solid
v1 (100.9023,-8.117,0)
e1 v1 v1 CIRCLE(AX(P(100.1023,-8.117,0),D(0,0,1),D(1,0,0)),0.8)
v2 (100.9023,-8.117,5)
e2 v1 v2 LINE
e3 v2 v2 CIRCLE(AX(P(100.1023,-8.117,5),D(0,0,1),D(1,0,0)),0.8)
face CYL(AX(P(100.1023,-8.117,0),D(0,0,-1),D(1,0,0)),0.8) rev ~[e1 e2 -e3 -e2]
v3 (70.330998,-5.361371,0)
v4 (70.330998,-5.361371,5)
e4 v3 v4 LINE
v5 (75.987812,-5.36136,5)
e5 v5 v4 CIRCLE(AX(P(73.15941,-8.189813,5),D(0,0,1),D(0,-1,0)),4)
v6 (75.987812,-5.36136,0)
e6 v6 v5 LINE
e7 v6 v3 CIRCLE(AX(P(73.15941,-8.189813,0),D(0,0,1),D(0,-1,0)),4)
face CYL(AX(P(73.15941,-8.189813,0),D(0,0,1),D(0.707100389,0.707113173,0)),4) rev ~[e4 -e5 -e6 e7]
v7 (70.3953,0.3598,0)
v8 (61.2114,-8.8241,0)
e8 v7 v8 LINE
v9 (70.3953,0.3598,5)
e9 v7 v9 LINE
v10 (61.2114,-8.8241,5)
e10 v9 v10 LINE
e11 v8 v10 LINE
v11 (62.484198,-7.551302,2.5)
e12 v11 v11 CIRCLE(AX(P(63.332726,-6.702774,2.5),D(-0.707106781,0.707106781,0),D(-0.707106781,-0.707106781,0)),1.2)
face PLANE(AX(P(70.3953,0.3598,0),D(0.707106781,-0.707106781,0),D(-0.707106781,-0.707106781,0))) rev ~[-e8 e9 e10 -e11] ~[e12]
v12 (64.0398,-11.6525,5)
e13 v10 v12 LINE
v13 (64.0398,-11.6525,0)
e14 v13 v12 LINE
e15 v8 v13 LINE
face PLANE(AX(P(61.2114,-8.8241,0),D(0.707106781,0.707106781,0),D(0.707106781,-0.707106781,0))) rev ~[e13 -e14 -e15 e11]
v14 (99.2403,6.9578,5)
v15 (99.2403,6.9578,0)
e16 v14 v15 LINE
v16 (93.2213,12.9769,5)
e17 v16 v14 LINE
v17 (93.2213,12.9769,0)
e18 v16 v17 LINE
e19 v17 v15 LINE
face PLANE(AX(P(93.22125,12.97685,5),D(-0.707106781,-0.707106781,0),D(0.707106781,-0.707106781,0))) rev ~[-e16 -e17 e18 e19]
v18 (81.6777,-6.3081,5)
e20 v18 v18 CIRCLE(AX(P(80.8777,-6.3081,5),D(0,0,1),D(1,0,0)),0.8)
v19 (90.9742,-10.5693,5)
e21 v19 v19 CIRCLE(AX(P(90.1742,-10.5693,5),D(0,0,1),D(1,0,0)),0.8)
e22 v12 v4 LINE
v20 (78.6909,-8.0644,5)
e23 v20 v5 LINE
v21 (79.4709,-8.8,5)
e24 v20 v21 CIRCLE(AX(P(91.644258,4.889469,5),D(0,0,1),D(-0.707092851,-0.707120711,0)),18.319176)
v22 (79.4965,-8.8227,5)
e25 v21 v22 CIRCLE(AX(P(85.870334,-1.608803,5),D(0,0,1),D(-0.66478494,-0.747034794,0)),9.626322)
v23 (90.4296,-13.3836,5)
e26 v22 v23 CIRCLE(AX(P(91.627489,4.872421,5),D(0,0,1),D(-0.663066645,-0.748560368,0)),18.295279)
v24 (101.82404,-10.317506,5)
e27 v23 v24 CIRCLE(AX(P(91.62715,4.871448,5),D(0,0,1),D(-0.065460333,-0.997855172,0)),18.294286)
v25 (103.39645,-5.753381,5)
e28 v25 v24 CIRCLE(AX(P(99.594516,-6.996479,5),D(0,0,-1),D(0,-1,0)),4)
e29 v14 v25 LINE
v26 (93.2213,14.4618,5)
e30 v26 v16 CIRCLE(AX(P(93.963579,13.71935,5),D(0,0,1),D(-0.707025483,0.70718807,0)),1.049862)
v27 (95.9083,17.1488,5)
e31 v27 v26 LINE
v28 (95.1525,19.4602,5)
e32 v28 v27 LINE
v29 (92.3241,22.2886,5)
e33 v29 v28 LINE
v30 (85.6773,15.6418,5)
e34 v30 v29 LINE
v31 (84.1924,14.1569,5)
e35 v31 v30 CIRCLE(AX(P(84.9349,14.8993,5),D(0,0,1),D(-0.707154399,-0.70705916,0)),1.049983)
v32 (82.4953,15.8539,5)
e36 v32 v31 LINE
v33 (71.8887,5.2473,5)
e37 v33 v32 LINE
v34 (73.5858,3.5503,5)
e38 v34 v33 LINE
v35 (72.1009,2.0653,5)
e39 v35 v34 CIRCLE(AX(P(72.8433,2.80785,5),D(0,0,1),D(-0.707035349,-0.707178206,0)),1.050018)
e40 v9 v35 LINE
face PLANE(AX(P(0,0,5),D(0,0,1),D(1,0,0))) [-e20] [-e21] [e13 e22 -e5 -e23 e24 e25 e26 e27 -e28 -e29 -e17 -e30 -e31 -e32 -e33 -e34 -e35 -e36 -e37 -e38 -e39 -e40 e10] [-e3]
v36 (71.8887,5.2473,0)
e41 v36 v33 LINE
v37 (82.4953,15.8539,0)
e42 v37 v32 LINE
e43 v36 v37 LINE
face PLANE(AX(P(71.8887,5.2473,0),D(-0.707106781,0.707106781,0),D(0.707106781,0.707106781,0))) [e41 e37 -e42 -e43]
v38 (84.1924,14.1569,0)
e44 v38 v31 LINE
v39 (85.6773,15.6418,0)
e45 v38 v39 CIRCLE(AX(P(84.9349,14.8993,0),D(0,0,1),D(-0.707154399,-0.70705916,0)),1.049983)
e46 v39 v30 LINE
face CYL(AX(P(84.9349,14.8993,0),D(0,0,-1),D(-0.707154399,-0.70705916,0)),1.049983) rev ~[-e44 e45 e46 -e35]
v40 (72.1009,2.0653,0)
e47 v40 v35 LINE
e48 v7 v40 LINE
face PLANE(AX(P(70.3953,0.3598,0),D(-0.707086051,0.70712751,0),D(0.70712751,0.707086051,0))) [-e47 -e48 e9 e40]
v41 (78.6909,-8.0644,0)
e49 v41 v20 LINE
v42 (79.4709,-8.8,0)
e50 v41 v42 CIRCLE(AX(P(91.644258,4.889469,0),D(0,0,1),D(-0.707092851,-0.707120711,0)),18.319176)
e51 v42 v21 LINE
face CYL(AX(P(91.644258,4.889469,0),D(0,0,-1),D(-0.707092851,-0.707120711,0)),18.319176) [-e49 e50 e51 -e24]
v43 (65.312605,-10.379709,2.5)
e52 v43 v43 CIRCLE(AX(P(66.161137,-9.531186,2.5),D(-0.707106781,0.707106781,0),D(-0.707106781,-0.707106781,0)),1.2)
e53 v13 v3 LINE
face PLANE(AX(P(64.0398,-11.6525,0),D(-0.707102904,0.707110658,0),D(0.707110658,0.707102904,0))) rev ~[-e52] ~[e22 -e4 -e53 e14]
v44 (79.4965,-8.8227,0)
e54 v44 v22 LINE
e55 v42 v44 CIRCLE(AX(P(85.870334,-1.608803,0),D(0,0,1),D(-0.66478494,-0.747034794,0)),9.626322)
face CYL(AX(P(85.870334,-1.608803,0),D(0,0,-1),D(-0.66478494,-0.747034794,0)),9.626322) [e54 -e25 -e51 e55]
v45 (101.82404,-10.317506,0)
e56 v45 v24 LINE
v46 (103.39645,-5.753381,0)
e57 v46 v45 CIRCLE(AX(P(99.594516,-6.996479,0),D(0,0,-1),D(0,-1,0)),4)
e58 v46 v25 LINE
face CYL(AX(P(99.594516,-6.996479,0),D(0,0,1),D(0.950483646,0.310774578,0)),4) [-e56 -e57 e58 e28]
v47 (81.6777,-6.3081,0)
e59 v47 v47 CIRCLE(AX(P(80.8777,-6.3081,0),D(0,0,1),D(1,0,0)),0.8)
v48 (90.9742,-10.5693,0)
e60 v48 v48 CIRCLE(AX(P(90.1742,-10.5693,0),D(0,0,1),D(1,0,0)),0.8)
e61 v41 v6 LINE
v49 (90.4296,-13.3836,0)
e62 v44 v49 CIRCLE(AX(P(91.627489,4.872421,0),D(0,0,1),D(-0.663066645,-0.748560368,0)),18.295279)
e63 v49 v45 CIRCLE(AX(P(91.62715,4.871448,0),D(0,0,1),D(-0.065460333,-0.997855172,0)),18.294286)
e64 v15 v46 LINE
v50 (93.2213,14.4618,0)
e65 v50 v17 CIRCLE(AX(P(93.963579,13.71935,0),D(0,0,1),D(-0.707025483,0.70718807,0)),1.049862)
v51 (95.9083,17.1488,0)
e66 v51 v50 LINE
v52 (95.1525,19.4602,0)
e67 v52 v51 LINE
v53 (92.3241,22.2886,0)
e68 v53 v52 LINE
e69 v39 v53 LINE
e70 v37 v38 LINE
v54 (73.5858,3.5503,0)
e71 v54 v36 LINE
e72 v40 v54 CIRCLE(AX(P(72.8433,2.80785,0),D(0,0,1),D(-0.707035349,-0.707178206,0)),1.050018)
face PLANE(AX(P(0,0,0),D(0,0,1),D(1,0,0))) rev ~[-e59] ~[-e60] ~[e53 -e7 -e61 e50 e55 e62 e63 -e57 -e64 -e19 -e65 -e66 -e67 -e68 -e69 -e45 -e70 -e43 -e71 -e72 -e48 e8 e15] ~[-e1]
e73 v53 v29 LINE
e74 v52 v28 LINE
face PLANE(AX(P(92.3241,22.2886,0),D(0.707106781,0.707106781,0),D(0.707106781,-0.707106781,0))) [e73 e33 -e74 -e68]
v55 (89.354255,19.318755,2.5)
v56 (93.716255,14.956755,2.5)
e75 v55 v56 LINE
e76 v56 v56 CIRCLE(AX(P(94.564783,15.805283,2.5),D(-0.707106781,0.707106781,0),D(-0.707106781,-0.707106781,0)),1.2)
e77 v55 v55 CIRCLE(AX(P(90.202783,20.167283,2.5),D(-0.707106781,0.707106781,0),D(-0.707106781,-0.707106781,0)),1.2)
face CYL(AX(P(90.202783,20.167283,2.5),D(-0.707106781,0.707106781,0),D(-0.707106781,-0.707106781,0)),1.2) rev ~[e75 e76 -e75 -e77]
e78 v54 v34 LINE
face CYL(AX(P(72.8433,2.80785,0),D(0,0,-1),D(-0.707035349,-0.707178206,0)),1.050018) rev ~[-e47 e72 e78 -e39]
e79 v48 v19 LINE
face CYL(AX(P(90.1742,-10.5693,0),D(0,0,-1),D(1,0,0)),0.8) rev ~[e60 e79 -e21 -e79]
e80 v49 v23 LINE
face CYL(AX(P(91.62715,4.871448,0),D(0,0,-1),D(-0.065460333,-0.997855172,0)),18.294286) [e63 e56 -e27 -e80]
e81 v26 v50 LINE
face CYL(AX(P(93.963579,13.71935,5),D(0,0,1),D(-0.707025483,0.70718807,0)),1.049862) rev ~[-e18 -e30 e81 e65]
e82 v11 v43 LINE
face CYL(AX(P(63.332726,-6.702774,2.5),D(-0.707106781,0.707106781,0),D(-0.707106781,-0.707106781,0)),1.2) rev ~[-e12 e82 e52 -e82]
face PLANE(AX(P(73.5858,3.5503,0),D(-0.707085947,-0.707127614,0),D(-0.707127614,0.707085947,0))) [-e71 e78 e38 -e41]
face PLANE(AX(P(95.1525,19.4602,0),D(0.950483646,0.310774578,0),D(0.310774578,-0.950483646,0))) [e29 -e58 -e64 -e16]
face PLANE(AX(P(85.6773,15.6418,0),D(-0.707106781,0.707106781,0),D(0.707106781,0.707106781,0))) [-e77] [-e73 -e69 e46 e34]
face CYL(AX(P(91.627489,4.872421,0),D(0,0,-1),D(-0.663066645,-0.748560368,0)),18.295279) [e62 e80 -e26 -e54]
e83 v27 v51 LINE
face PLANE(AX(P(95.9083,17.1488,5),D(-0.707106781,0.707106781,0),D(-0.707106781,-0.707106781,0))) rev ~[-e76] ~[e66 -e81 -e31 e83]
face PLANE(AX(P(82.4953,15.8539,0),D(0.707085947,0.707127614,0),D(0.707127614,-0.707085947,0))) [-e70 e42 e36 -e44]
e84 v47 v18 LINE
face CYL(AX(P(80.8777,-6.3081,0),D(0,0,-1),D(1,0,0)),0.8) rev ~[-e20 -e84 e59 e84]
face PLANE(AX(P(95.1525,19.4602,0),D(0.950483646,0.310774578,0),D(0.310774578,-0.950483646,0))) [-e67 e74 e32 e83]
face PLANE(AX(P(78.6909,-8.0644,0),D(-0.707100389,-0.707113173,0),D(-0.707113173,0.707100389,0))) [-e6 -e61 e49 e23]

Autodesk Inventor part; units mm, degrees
ref_plane "YZ Plane" through (0, 0, 0) normal (1, 0, 0) x (0, 1, 0)
ref_plane "XZ Plane" through (0, 0, 0) normal (0, 1, 0) x (-1, 0, 0)
ref_plane "XY Plane" through (0, 0, 0) normal (0, 0, 1) x (1, 0, 0)
sketch "スケッチ2" plane through (0, 0, 0) normal (0, 0, 1) x (1, 0, 0)
  line L0 (0, 0) -> (7, 0) construction
  line L1 (7, 0) -> (7, -27) construction
  line L2 (7, -27) -> (0, -27) construction
  line L3 (0, -27) -> (0, 0) construction
  circle A0 centre (2.5, -3.7) radius 1.6 construction
  circle A1 centre (2.5, -23.3) radius 1.6 construction
  line L4 (5.05, -7.5) -> (0.05, -7.5) construction
  line L5 (0.05, -7.5) -> (0.05, -19.5) construction
  line L6 (0.05, -19.5) -> (5.05, -19.5) construction
  line L7 (5.05, -19.5) -> (5.05, -7.5) construction
  line L8 (0, -7.45) -> (5.1, -7.45) construction
  line L9 (5.1, -7.45) -> (5.1, -19.55) construction
  line L10 (5.1, -19.55) -> (0, -19.55) construction
  line L11 (0, -19.55) -> (0, -7.45) construction
  line L12 (88.7886, 25.8241) -> (57.6759, -5.2886) construction
  line L13 (57.6759, -5.2886) -> (61.2114, -8.8241) construction
  line L14 (61.2114, -8.8241) -> (84.1924, 14.1569) construction
  line L15 (92.3241, 22.2886) -> (88.7886, 25.8241) construction
  line L16 (70.3953, 0.3598) -> (72.1009, 2.0653)
  circle A2 centre (100.1023, -8.117) radius 0.8
  line L17 (7, 0) -> (45.561, -10.3324) construction
  line L18 (7, -27) -> (50.4418, -38.6402) construction
  line L19 (72.4418, -38.6402) -> (106.1477, -10.3575) construction
  line L20 (106.1477, -10.3575) -> (100.2529, -4.1751) construction
  arc A3 (45.561, -10.3324) -> (81.4937, -2.447) centre (55.9138, 28.3046) ccw construction
  line L21 (72.4418, -38.6402) -> (50.4418, -38.6402) construction
  line L22 (39, -8.8) -> (34, -8.8) construction
  line L23 (34, -8.8) -> (34, -33.8) construction
  line L24 (34, -33.8) -> (39, -33.8) construction
  line L25 (39, -33.8) -> (39, -8.8) construction
  circle A4 centre (97.0056, -9.675) radius 0.8 construction
  circle A5 centre (93.6401, -10.5063) radius 0.8 construction
  circle A6 centre (90.1742, -10.5693) radius 0.8
  circle A7 centre (86.7807, -9.8609) radius 0.8 construction
  circle A8 centre (83.6295, -8.4164) radius 0.8 construction
  circle A9 centre (80.8777, -6.3081) radius 0.8
  line L26 (100.2529, -4.1751) -> (104.2516, -8.3688)
  arc A10 (81.4937, -2.447) -> (100.2529, -4.1751) centre (91.6271, 4.8718) ccw construction
  line L27 (39, -15.3) -> (34, -15.3) construction
  line L28 (34, -15.3) -> (34, -27.3) construction
  line L29 (34, -27.3) -> (39, -27.3) construction
  line L30 (39, -27.3) -> (39, -15.3) construction
  line L31 (33.95, -15.25) -> (39.05, -15.25) construction
  line L32 (39.05, -15.25) -> (39.05, -27.35) construction
  line L33 (39.05, -27.35) -> (33.95, -27.35) construction
  line L34 (33.95, -27.35) -> (33.95, -15.25) construction
  circle A11 centre (36.5, -11.5) radius 1.6 construction
  circle A12 centre (36.5, -31.1) radius 1.6 construction
  line L35 (66, -30.5) -> (71, -30.5) construction
  circle A13 centre (68.5, -34.3) radius 1.6 construction
  line L36 (66, -37) -> (71, -37) construction
  line L37 (66, -18.5) -> (66, -30.5) construction
  line L38 (65.95, -30.55) -> (65.95, -18.45) construction
  line L39 (71, -30.5) -> (71, -18.5) construction
  line L40 (66, -12) -> (66, -37) construction
  line L41 (71, -37) -> (71, -12) construction
  line L42 (71.05, -18.45) -> (71.05, -30.55) construction
  line L43 (71.05, -30.55) -> (65.95, -30.55) construction
  circle A14 centre (68.5, -14.7) radius 1.6 construction
  line L44 (71, -18.5) -> (66, -18.5) construction
  line L45 (65.95, -18.45) -> (71.05, -18.45) construction
  line L46 (71, -12) -> (66, -12) construction
  circle A15 centre (71.05, -19.5) radius 1.05 construction
  circle A16 centre (65.95, -19.5) radius 1.05 construction
  circle A17 centre (65.95, -29.5) radius 1.05 construction
  circle A18 centre (71.05, -29.5) radius 1.05 construction
  circle A19 centre (39.05, -16.3) radius 1.05 construction
  circle A20 centre (33.95, -16.3) radius 1.05 construction
  circle A21 centre (33.95, -26.3) radius 1.05 construction
  circle A22 centre (39.05, -26.3) radius 1.05 construction
  circle A23 centre (5.1, -8.5) radius 1.05 construction
  circle A24 centre (0, -8.5) radius 1.05 construction
  circle A25 centre (0, -18.5) radius 1.05 construction
  circle A26 centre (5.1, -18.5) radius 1.05 construction
  line L47 (-3, -7.45) -> (-3, -19.55) construction
  line L48 (-3, -19.55) -> (0, -27) construction
  line L49 (-3, -7.45) -> (0, 0) construction
  circle A27 centre (91.6271, 4.8718) radius 15.5 construction
  arc A28 (77.4664, -6.7113) -> (78.1043, -7.45) centre (91.6271, 4.8718) ccw construction
  line L50 (77.4664, -6.7113) -> (80.2948, -9.5397) construction
  line L51 (104.2516, -8.3688) -> (82.9591, 12.9236) construction
  line L52 (82.9591, 12.9236) -> (84.1924, 14.1569) construction
  line L53 (70.3953, 0.3598) -> (61.2114, -8.8241)
  line L54 (92.3241, 22.2886) -> (95.1525, 19.4602)
  line L55 (95.1525, 19.4602) -> (104.2516, -8.3688)
  line L56 (61.2114, -8.8241) -> (64.0398, -11.6525)
  arc A29 (90.4296, -13.3836) -> (104.2516, -8.3688) centre (91.6271, 4.8718) ccw
  line L57 (64.0398, -11.6525) -> (73.1594, -2.533)
  arc A30 (79.4965, -8.8227) -> (90.4296, -13.3836) centre (91.6271, 4.8718) ccw
  arc A31 (78.1501, -7.5) -> (78.6909, -8.0644) centre (91.6271, 4.8718) ccw construction
  arc A32 (79.4709, -8.8) -> (79.4965, -8.8227) centre (91.6271, 4.8718) ccw
  arc A33 (78.1043, -7.45) -> (78.1501, -7.5) centre (91.6271, 4.8718) ccw construction
  line L58 (84.1924, 14.1569) -> (73.5858, 3.5503) construction
  line L59 (73.5858, 3.5503) -> (71.8887, 5.2473)
  line L60 (71.8887, 5.2473) -> (82.4953, 15.8539)
  line L61 (82.4953, 15.8539) -> (84.1924, 14.1569)
  line L62 (73.5858, 3.5503) -> (82.9591, 12.9236) construction
  line L63 (84.1924, 14.1569) -> (85.6773, 15.6418) construction
  line L64 (84.1924, 14.1569) -> (85.6773, 15.6418) construction
  arc A34 (84.1924, 14.1569) -> (85.6773, 15.6418) centre (84.9349, 14.8993) ccw
  arc A35 (72.1009, 2.0653) -> (73.5858, 3.5503) centre (72.8433, 2.8078) ccw
  arc A36 (85.6773, 15.6418) -> (84.1924, 14.1569) centre (84.9349, 14.8993) ccw construction
  line L65 (85.6773, 15.6418) -> (92.3241, 22.2886) construction
  line L66 (72.1009, 2.0653) -> (73.5858, 3.5503) construction
  arc A37 (73.5858, 3.5503) -> (72.1009, 2.0653) centre (72.8433, 2.8078) ccw construction
  line L67 (85.6773, 15.6418) -> (92.3241, 22.2886)
  line L68 (78.6909, -8.0644) -> (73.1594, -2.533)
  arc A38 (78.6909, -8.0644) -> (79.4709, -8.8) centre (91.6271, 4.8718) ccw
  point P0 (75, 8.5)
  point P1 (91.5446, -20.9171)
  point P2 (82.042, -3.1517)
  point P3 (81.2596, -2.6403)
  point P4 (55.561, -0.3324)
  point P5 (39, -14.2)
  point P6 (34, -14.2)
  point P7 (39, -28.4)
  point P8 (34, -28.4)
  point P9 (79.9568, -9.217)
  dimension "d74" = 7
  dimension "d75" = 27
  dimension "d76" = 3.2
  dimension "d77" = 3.2
  dimension "d78" = 5
  dimension "d79" = 12
  dimension "d80" = 2.5
  dimension "d81" = 2.5
  dimension "d82" = 19.6
  dimension "d83" = 3.7
  dimension "d84" = 7.5
  dimension "d85" = 0.05
  dimension "d86" = 44
  dimension "d87" = 5
  dimension "d88" = 45
  dimension "d89" = 2.5
  dimension "d90" = 22
  dimension "d91" = 75
  dimension "d92" = 8.5
  dimension "d93" = 30
  dimension "d94" = 27
  dimension "d95" = 1.6
  dimension "d96" = 75
  dimension "d97" = 75
  dimension "d98" = 40
  dimension "d99" = 30
  dimension "d100" = 39
  dimension "d101" = 5
  dimension "d102" = 25
  dimension "d103" = 32
  dimension "d104" = 8.8
  dimension "d105" = 77
  dimension "d106" = 22
  dimension "d107" = 12.5
  dimension "d108" = 50
  dimension "d109" = 21
  dimension "d110" = 44
  dimension "d111" = 12
  dimension "d112" = 6.5
  dimension "d113" = 0.05
  dimension "d114" = 3.2
  dimension "d115" = 2.5
  dimension "d116" = 2.7
  dimension "d117" = 3.2
  dimension "d118" = 19.6
  dimension "d119" = 2.5
  dimension "d120" = 5
  dimension "d121" = 25
  dimension "d122" = 12
  dimension "d123" = 6.5
  dimension "d124" = 0.05
  dimension "d125" = 3.2
  dimension "d126" = 2.5
  dimension "d127" = 2.7
  dimension "d128" = 3.2
  dimension "d129" = 19.6
  dimension "d130" = 2.5
  dimension "d131" = 12
  dimension "d132" = 64
  dimension "d133" = 2.1
  dimension "d134" = 2.1
  dimension "d135" = 2.1
  dimension "d136" = 2.1
  dimension "d137" = 2.1
extrude "押し出し2" add sketch "スケッチ2" along normal blind 5
sketch "スケッチ3" plane through (85.6773, 15.6418, 0) normal (-0.7071068, 0.7071068, 0) x (-0.7071068, -0.7071068, 0)
  circle A0 centre (-6.4, 2.5) radius 1.2
  circle A1 centre (31.6, 2.5) radius 1.2
  line L0 (-9.4, 0) -> (0, 0) projected
  line L1 (-9.4, 0) -> (-9.4, 5) projected
  line L2 (34.6, 0) -> (34.6, 5) projected
  line L3 (19.2, 0) -> (34.6, 0) projected
  point P0 (71.6434, 0)
  dimension "d165" = 2.4
  dimension "d166" = 2.4
  dimension "d167" = 2.5
  dimension "d168" = 3
  dimension "d169" = 3
  dimension "d170" = 2.5
extrude "押し出し3" cut sketch "スケッチ3" against normal through all
fillet "フィレット1" radius 4 2 edges at (104.2516, -8.3688, 2.5) (73.1594, -2.533, 2.5)
sketch "スケッチ5" plane through (0, 0, 5) normal (0, 0, 1) x (1, 0, 0)
  line L0 (89.3543, 19.3187) -> (91.0513, 21.0158) construction
  line L1 (103.3964, -5.7534) -> (95.1525, 19.4602) construction
  line L2 (95.9083, 17.1488) -> (92.4788, 13.7193)
  line L3 (92.4788, 13.7193) -> (99.2403, 6.9578)
  line L4 (90.2028, 20.1673) -> (100.0709, 10.2991) construction
  line L5 (92.3241, 22.2886) -> (85.6773, 15.6418) construction
  line L6 (93.2213, 14.4618) -> (93.9637, 13.7193) construction
  line L7 (93.9637, 13.7193) -> (93.2213, 12.9769) construction
  arc A0 (93.2213, 14.4618) -> (93.2213, 12.9769) centre (93.9637, 13.7193) ccw
  line L8 (93.2213, 14.4618) -> (98.519, 9.1641) construction
  line L9 (95.9083, 17.1488) -> (101.13, 11.927) construction
  line L10 (99.2403, 6.9578) -> (95.9083, 17.1488)
  point P0 (0, 0)
  point P1 (95.9083, 17.1488)
  dimension "d179" = 1.05
  dimension "d180" = 1.9
extrude "押し出し4" cut sketch "スケッチ5" against normal up to surface (5 mm away) contours L10 L3 A0 L2
properties part number "カメラ_メインフレーム" material "アセタール樹脂、黒"
